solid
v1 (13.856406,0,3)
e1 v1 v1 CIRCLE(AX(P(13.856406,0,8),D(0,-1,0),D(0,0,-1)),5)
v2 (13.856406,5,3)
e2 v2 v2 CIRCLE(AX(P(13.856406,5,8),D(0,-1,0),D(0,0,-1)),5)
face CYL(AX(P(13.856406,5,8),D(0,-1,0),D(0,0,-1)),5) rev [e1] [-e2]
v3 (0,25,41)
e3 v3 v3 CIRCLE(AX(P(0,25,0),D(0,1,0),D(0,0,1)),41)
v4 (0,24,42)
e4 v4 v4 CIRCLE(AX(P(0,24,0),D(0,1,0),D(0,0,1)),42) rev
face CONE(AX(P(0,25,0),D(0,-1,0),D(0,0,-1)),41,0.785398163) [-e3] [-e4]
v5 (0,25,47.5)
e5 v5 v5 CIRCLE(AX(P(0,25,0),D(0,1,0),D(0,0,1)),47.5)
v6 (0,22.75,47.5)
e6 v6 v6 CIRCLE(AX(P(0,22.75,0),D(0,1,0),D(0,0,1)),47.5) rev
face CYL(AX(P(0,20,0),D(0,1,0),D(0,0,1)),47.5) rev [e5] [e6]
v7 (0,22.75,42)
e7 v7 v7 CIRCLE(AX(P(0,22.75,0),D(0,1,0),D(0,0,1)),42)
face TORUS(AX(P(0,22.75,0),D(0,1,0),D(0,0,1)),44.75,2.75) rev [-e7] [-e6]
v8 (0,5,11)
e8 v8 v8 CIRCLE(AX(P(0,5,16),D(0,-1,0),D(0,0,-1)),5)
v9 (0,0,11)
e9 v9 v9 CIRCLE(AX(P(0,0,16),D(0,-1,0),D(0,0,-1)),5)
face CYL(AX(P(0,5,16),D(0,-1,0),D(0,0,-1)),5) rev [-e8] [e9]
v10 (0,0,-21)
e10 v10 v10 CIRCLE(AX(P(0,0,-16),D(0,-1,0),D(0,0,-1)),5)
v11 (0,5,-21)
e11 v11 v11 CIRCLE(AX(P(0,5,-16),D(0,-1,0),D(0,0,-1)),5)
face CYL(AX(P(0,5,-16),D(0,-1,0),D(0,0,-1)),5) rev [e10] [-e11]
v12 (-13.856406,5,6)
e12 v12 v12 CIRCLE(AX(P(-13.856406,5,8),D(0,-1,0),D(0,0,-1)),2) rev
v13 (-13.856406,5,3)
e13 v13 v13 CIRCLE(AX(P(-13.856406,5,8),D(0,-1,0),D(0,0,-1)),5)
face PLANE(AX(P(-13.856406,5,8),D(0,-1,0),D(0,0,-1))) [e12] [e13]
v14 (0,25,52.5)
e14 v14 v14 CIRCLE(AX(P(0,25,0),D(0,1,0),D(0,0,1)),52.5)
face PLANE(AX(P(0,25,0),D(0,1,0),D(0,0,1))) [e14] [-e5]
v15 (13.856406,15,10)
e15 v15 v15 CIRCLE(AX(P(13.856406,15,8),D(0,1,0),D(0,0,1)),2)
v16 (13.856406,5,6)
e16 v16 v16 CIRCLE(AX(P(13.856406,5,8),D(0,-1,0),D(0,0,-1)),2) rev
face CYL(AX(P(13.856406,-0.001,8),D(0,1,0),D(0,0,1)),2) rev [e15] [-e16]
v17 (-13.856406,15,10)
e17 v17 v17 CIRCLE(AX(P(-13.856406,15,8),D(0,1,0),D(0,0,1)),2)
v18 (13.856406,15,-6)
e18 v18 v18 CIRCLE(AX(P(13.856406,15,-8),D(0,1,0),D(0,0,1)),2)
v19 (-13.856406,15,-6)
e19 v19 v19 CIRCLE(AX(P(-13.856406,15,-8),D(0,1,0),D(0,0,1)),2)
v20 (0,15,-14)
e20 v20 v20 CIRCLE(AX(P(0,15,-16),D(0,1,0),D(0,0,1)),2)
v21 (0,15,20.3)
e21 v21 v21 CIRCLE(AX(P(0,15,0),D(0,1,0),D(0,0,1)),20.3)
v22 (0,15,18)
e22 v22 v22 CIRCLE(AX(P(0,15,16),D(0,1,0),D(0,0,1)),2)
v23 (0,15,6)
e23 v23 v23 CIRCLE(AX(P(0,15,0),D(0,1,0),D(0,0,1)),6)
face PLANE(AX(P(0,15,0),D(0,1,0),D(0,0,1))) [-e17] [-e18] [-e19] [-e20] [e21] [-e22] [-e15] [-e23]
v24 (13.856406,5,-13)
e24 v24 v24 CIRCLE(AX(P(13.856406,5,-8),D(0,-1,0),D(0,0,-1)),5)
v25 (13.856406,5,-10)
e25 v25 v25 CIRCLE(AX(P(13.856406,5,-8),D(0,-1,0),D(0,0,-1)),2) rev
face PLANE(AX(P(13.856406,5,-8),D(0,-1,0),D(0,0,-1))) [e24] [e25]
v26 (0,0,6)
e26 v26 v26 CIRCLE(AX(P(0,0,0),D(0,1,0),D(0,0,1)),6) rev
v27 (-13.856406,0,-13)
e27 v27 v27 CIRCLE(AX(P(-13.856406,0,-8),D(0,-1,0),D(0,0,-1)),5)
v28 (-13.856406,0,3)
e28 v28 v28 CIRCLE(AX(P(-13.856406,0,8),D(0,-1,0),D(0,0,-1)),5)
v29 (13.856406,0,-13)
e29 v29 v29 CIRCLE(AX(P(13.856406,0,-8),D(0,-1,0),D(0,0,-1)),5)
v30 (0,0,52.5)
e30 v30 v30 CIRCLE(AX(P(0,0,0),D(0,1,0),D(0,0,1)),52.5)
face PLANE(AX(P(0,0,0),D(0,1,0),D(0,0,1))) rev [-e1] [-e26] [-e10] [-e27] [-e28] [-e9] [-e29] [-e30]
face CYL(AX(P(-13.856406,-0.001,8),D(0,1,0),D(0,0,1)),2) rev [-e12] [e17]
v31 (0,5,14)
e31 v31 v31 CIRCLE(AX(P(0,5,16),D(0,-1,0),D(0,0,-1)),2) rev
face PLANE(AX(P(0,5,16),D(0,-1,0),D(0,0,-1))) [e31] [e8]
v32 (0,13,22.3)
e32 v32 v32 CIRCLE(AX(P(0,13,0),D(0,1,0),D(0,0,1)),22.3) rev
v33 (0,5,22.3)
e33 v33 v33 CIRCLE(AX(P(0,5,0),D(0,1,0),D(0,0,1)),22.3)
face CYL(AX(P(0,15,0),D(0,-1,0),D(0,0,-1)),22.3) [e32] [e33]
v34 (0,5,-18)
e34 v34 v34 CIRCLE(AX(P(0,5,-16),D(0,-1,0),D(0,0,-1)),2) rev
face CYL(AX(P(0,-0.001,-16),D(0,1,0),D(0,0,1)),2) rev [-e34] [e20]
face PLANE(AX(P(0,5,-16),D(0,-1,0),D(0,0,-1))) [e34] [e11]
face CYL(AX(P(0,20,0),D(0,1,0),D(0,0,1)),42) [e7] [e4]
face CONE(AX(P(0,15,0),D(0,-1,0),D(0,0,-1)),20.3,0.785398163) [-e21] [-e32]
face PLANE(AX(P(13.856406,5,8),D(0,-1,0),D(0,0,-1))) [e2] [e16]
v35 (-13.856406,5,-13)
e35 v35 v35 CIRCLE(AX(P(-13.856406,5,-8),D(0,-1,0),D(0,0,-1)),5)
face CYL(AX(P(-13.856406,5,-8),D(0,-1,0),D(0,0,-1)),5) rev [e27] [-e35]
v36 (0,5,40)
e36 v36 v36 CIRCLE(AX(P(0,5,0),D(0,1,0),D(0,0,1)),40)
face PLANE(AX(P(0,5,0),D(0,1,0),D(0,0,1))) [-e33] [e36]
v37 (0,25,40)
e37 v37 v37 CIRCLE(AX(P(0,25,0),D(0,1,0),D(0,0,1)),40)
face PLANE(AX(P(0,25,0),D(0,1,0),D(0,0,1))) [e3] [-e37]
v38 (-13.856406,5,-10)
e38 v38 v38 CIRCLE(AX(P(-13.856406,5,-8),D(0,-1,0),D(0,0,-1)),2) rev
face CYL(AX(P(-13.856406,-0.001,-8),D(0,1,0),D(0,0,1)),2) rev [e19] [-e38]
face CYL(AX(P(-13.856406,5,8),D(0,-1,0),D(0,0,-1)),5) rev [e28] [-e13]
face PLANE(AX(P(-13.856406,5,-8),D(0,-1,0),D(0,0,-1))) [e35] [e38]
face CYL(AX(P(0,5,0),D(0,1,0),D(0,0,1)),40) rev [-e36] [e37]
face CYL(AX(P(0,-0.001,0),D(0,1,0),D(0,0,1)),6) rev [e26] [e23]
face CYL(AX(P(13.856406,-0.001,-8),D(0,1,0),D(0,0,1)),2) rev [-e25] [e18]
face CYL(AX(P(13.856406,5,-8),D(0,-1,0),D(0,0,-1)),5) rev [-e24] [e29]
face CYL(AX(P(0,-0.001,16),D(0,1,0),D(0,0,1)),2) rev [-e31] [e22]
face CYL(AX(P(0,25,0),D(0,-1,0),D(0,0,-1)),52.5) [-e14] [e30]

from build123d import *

# Parameters (mm, degrees)
ESQUISSE1_R             = 52.5
BOSS_EXTRU_1_DEPTH      = 25
ESQUISSE2_R             = 40
ENL_V_MAT_EXTRU_1_DEPTH = 20
ESQUISSE3_R             = 22.3
BOSS_EXTRU_2_DEPTH      = 10
CHANFREIN1_SIZE         = 2
ENL_V_MAT_EXTRU_2_REACH = 77.746
ESQUISSE4_R             = 2
ESQUISSE4_R_2           = 6
ESQUISSE5_R             = 47.5
ESQUISSE5_R_2           = 42
ENL_V_MAT_EXTRU_3_DEPTH = 5
CONG_2_R                = 2.75
CHANFREIN2_SIZE         = 1
ESQUISSE6_R             = 5
ENL_V_MAT_EXTRU_4_DEPTH = 5


with BuildPart() as part:
    # Esquisse1 → Boss.-Extru.1 (new body)
    with BuildSketch(Plane(origin=(0, 0, 0), x_dir=(1, 0, 0), z_dir=(0, 1, 0))):
        with Locations(Location((0, 0, 0), (0, 0, 270))):
            Circle(ESQUISSE1_R)
    extrude(amount=BOSS_EXTRU_1_DEPTH)

    # Esquisse2 → Enlèv. mat.-Extru.1 (cut)
    with BuildSketch(Plane(origin=(0, 25, 0), x_dir=(1, 0, 0), z_dir=(0, 1, 0))):
        with Locations(Location((0, 0, 0), (0, 0, 270))):
            Circle(ESQUISSE2_R)
    extrude(amount=-ENL_V_MAT_EXTRU_1_DEPTH, mode=Mode.SUBTRACT)

    # Esquisse3 → Boss.-Extru.2 (add)
    with BuildSketch(Plane(origin=(0, 5, 0), x_dir=(1, 0, 0), z_dir=(0, 1, 0))):
        with Locations(Location((0, 0, 0), (0, 0, 270))):
            Circle(ESQUISSE3_R)
    extrude(amount=BOSS_EXTRU_2_DEPTH)

    # Chanfrein1
    chanfrein1_edges = [part.edges().sort_by_distance(p)[0] for p in [
        (0, 15, -22.3),
    ]]
    chamfer(chanfrein1_edges, length=CHANFREIN1_SIZE)

    # Esquisse4 → Enlèv. mat.-Extru.2 (cut, up to next)
    with BuildSketch(Plane(origin=(0, 15, 0), x_dir=(1, 0, 0), z_dir=(0, 1, 0)), mode=Mode.PRIVATE) as enl_v_mat_extru_2_sk1:
        with Locations(Location((0, 16, 0), (0, 0, 270))):
            Circle(ESQUISSE4_R)
    enl_v_mat_extru_2_tool1 = extrude(enl_v_mat_extru_2_sk1.sketch, amount=-ENL_V_MAT_EXTRU_2_REACH, mode=Mode.PRIVATE) & part.part
    # Esquisse4 → Enlèv. mat.-Extru.2 (cut, up to next)
    with BuildSketch(Plane(origin=(0, 15, 0), x_dir=(1, 0, 0), z_dir=(0, 1, 0)), mode=Mode.PRIVATE) as enl_v_mat_extru_2_sk2:
        with Locations(Location((13.856406461, 8, 0), (0, 0, 270))):
            Circle(ESQUISSE4_R)
    enl_v_mat_extru_2_tool2 = extrude(enl_v_mat_extru_2_sk2.sketch, amount=-ENL_V_MAT_EXTRU_2_REACH, mode=Mode.PRIVATE) & part.part
    # Esquisse4 → Enlèv. mat.-Extru.2 (cut, up to next)
    with BuildSketch(Plane(origin=(0, 15, 0), x_dir=(1, 0, 0), z_dir=(0, 1, 0)), mode=Mode.PRIVATE) as enl_v_mat_extru_2_sk3:
        with Locations(Location((13.856406461, -8, 0), (0, 0, 270))):
            Circle(ESQUISSE4_R)
    enl_v_mat_extru_2_tool3 = extrude(enl_v_mat_extru_2_sk3.sketch, amount=-ENL_V_MAT_EXTRU_2_REACH, mode=Mode.PRIVATE) & part.part
    # Esquisse4 → Enlèv. mat.-Extru.2 (cut, up to next)
    with BuildSketch(Plane(origin=(0, 15, 0), x_dir=(1, 0, 0), z_dir=(0, 1, 0)), mode=Mode.PRIVATE) as enl_v_mat_extru_2_sk4:
        with Locations(Location((0, -16, 0), (0, 0, 270))):
            Circle(ESQUISSE4_R)
    enl_v_mat_extru_2_tool4 = extrude(enl_v_mat_extru_2_sk4.sketch, amount=-ENL_V_MAT_EXTRU_2_REACH, mode=Mode.PRIVATE) & part.part
    # Esquisse4 → Enlèv. mat.-Extru.2 (cut, up to next)
    with BuildSketch(Plane(origin=(0, 15, 0), x_dir=(1, 0, 0), z_dir=(0, 1, 0)), mode=Mode.PRIVATE) as enl_v_mat_extru_2_sk5:
        with Locations(Location((-13.856406461, -8, 0), (0, 0, 270))):
            Circle(ESQUISSE4_R)
    enl_v_mat_extru_2_tool5 = extrude(enl_v_mat_extru_2_sk5.sketch, amount=-ENL_V_MAT_EXTRU_2_REACH, mode=Mode.PRIVATE) & part.part
    # Esquisse4 → Enlèv. mat.-Extru.2 (cut, up to next)
    with BuildSketch(Plane(origin=(0, 15, 0), x_dir=(1, 0, 0), z_dir=(0, 1, 0)), mode=Mode.PRIVATE) as enl_v_mat_extru_2_sk6:
        with Locations(Location((-13.856406461, 8, 0), (0, 0, 270))):
            Circle(ESQUISSE4_R)
    enl_v_mat_extru_2_tool6 = extrude(enl_v_mat_extru_2_sk6.sketch, amount=-ENL_V_MAT_EXTRU_2_REACH, mode=Mode.PRIVATE) & part.part
    # Esquisse4 → Enlèv. mat.-Extru.2 (cut, up to next)
    with BuildSketch(Plane(origin=(0, 15, 0), x_dir=(1, 0, 0), z_dir=(0, 1, 0)), mode=Mode.PRIVATE) as enl_v_mat_extru_2_sk7:
        with Locations(Location((0, 0, 0), (0, 0, 270))):
            Circle(ESQUISSE4_R_2)
    enl_v_mat_extru_2_tool7 = extrude(enl_v_mat_extru_2_sk7.sketch, amount=-ENL_V_MAT_EXTRU_2_REACH, mode=Mode.PRIVATE) & part.part
    add(enl_v_mat_extru_2_tool1.solids().sort_by_distance((0, 15, -16))[0], mode=Mode.SUBTRACT)
    add(enl_v_mat_extru_2_tool2.solids().sort_by_distance((13.856406, 15, -8))[0], mode=Mode.SUBTRACT)
    add(enl_v_mat_extru_2_tool3.solids().sort_by_distance((13.856406, 15, 8))[0], mode=Mode.SUBTRACT)
    add(enl_v_mat_extru_2_tool4.solids().sort_by_distance((0, 15, 16))[0], mode=Mode.SUBTRACT)
    add(enl_v_mat_extru_2_tool5.solids().sort_by_distance((-13.856406, 15, 8))[0], mode=Mode.SUBTRACT)
    add(enl_v_mat_extru_2_tool6.solids().sort_by_distance((-13.856406, 15, -8))[0], mode=Mode.SUBTRACT)
    add(enl_v_mat_extru_2_tool7.solids().sort_by_distance((0, 15, 0))[0], mode=Mode.SUBTRACT)

    # Esquisse5 → Enlèv. mat.-Extru.3 (cut)
    with BuildSketch(Plane(origin=(0, 25, 0), x_dir=(1, 0, 0), z_dir=(0, 1, 0))):
        with Locations(Location((0, 0, 0), (0, 0, 270))):
            Circle(ESQUISSE5_R)
        with Locations(Location((0, 0, 0), (0, 0, 270))):
            Circle(ESQUISSE5_R_2, mode=Mode.SUBTRACT)
    extrude(amount=-ENL_V_MAT_EXTRU_3_DEPTH, mode=Mode.SUBTRACT)

    # Congé2
    cong_2_edges = [part.edges().sort_by_distance(p)[0] for p in [
        (0, 20, -47.5),
        (0, 20, -42),
    ]]
    fillet(cong_2_edges, radius=CONG_2_R - 0.0001)  # a hair under: the kernel refuses the full size

    # Chanfrein2
    chanfrein2_edges = [part.edges().sort_by_distance(p)[0] for p in [
        (0, 25, -42),
    ]]
    chamfer(chanfrein2_edges, length=CHANFREIN2_SIZE)

    # Esquisse6 → Enlèv. mat.-Extru.4 (cut)
    with BuildSketch(Plane.XZ):
        with Locations(Location((0, 16, 0), (0, 0, 270))):
            Circle(ESQUISSE6_R)
        with Locations(Location((13.856406461, 8, 0), (0, 0, 270))):
            Circle(ESQUISSE6_R)
        with Locations(Location((13.856406461, -8, 0), (0, 0, 270))):
            Circle(ESQUISSE6_R)
        with Locations(Location((0, -16, 0), (0, 0, 270))):
            Circle(ESQUISSE6_R)
        with Locations(Location((-13.856406461, -8, 0), (0, 0, 270))):
            Circle(ESQUISSE6_R)
        with Locations(Location((-13.856406461, 8, 0), (0, 0, 270))):
            Circle(ESQUISSE6_R)
    extrude(amount=-ENL_V_MAT_EXTRU_4_DEPTH, mode=Mode.SUBTRACT)


solid = part.part
